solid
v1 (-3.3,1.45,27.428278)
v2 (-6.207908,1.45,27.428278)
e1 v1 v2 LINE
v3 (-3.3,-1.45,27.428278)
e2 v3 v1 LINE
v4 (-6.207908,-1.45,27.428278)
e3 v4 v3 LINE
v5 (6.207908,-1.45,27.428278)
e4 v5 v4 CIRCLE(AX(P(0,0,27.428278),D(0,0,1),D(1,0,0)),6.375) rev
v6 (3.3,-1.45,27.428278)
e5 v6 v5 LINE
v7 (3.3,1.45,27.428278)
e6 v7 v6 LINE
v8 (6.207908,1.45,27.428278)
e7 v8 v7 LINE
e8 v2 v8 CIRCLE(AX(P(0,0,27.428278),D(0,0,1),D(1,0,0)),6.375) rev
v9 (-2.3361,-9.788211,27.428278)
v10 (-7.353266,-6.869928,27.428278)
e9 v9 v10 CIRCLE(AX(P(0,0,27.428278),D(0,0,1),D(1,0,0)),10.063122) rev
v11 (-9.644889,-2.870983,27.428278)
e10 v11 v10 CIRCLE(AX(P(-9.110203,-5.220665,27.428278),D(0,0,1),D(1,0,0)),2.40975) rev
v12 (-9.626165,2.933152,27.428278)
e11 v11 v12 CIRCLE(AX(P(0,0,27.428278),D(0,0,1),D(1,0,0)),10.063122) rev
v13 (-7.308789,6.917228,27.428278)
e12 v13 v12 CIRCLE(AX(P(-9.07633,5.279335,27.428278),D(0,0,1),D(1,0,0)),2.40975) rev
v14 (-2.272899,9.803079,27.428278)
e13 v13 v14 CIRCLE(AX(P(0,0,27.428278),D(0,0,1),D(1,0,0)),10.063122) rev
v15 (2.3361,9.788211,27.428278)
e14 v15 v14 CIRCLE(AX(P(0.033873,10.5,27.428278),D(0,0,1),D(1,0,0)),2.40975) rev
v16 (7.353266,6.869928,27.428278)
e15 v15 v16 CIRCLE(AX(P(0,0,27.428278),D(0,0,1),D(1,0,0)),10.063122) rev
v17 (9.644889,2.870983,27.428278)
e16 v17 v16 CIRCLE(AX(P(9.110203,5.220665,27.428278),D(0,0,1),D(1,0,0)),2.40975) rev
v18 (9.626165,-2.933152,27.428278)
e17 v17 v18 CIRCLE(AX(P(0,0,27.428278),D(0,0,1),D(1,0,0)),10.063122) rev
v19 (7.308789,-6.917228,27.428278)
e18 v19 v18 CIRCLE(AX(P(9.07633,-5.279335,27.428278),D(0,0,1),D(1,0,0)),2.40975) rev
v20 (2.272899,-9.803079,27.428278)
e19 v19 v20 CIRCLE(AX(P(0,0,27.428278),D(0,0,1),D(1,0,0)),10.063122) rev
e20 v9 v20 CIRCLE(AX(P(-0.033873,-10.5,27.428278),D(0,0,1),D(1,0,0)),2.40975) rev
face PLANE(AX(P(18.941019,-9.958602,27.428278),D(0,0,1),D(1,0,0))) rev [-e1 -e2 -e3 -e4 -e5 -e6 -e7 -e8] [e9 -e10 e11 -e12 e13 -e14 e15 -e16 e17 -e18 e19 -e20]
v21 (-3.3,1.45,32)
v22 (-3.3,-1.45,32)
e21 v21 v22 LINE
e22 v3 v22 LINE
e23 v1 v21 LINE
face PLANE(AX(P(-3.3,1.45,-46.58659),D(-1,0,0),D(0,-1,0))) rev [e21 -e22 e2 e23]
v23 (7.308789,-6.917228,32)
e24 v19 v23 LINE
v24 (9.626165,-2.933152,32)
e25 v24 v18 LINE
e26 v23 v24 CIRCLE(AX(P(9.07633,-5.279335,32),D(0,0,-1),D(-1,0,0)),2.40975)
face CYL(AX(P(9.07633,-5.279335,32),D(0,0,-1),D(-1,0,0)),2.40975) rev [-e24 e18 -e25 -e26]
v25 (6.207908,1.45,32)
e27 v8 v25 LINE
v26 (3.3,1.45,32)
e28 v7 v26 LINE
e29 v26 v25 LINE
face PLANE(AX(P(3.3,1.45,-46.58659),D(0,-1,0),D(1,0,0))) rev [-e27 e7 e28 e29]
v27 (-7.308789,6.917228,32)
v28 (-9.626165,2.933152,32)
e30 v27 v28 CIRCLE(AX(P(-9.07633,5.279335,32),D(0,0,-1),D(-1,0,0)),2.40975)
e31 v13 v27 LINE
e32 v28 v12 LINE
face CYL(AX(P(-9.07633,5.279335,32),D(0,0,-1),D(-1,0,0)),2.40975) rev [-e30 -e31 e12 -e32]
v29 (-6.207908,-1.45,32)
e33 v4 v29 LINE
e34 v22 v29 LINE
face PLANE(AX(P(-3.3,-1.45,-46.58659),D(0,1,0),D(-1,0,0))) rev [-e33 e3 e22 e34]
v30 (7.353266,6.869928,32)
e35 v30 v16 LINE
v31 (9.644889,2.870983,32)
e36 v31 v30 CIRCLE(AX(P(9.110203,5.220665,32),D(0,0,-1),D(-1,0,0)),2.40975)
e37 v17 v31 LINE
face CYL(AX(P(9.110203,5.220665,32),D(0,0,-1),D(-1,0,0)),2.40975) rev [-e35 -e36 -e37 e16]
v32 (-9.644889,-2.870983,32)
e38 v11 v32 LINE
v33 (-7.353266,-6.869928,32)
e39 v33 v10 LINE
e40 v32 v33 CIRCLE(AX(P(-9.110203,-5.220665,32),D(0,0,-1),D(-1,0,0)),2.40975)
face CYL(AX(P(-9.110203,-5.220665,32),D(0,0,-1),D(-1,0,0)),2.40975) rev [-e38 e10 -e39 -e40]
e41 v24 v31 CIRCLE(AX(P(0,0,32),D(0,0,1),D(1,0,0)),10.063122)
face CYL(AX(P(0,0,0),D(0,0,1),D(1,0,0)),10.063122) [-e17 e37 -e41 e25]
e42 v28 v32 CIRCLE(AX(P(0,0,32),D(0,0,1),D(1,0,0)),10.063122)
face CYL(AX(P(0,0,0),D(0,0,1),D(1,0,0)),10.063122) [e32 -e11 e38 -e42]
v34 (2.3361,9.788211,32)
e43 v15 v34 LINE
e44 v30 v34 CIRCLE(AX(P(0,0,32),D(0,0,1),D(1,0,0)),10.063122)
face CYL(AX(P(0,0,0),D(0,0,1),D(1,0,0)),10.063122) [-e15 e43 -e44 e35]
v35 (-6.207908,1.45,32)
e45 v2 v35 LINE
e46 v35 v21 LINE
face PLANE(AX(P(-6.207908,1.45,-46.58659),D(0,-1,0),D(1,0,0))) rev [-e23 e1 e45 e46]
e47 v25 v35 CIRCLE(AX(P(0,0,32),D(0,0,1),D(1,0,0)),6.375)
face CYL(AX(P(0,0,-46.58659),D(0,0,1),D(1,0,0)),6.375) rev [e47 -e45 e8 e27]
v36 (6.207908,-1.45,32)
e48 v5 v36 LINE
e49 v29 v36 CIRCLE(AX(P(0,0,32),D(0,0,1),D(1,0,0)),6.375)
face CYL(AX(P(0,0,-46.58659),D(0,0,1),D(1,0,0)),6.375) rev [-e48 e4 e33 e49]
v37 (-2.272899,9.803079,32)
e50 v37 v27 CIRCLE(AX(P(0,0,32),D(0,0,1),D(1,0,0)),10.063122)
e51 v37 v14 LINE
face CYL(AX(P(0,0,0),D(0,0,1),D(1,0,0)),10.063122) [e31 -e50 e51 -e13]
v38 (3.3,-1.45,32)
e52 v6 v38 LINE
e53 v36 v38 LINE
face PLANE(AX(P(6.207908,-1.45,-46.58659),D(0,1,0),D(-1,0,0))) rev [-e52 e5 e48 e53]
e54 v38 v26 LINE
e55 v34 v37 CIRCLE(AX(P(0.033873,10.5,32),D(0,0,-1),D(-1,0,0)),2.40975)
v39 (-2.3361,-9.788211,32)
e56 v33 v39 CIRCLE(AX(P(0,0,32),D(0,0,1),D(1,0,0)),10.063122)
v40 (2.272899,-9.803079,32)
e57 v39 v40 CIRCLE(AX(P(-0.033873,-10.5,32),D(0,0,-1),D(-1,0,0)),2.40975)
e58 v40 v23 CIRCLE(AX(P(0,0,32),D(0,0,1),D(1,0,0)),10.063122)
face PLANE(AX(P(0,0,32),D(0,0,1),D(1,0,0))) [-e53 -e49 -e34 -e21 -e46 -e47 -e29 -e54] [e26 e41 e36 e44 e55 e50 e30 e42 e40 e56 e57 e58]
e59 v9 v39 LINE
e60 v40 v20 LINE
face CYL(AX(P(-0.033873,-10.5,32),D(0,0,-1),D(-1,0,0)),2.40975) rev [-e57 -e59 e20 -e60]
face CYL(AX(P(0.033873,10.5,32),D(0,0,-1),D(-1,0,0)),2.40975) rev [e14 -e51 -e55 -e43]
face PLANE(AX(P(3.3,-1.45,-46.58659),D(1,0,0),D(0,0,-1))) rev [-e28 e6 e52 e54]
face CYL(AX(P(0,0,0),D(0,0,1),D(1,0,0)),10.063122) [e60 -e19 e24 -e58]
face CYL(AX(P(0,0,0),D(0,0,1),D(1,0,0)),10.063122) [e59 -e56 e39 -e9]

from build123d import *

# Parameters (mm, degrees)
SKETCH3_R               = 21
BOSS_EXTRUDE3_DEPTH     = 32
CUT_EXTRUDE1_START      = -30
SKETCH4_R               = 21
SKETCH4_R_2             = 19.31273959
CUT_EXTRUDE1_DEPTH      = 28
SKETCH8_R               = 6.075
SKETCH8_R_2             = 2.409749928
CUT_EXTRUDE2_DEPTH      = 44.657759906
FILLET1_R               = 1
FILLET3_R               = 5
BOSS_EXTRUDE4_START     = -17
SKETCH11_R              = 8
BOSS_EXTRUDE4_DEPTH     = 15
SKETCH12_W              = 6.25
SKETCH12_H              = 3.5
BOSS_EXTRUDE5_DEPTH     = 17
SKETCH15_OUTSIDE_W      = 57.494
SKETCH15_OUTSIDE_H      = 57.494
SKETCH15_OUTSIDE_R      = 21
CUT_EXTRUDE3_DEPTH      = 17
SKETCH16_R              = 25.999161841
SKETCH16_R_2            = 10.063122469
CUT_EXTRUDE4_DEPTH      = 44.657759954
CUT_EXTRUDE5_DEPTH      = 35.948058737
CUT_EXTRUDE5_DEPTH_BACK = 35.948058737
SKETCH17_W              = 34.125667019
SKETCH17_H              = 28.204609122


with BuildPart() as part:
    # Sketch3 → Boss-Extrude3 (new body)
    with BuildSketch(Plane.XY):
        Circle(SKETCH3_R)
    extrude(amount=BOSS_EXTRUDE3_DEPTH)

    # Sketch4 → Cut-Extrude1 (cut)
    with BuildSketch(Plane.XY.offset(32).offset(CUT_EXTRUDE1_START)):
        Circle(SKETCH4_R)
        Circle(SKETCH4_R_2, mode=Mode.SUBTRACT)
    extrude(amount=CUT_EXTRUDE1_DEPTH, mode=Mode.SUBTRACT)

    # Cut-Sweep1: sweep along a curve in space
    with BuildLine() as cut_sweep1_path:
        ThreePointArc((19.31273959, 0, 2), (13.656169127, 13.656169127, 2), (0, 19.31273959, 2))
        ThreePointArc((0, 19.31273959, 2), (-13.656169127, 13.656169127, 2), (-19.31273959, 0, 2))
        ThreePointArc((-19.31273959, 0, 2), (-13.656169127, -13.656169127, 2), (0, -19.31273959, 2))
        ThreePointArc((0, -19.31273959, 2), (13.656169127, -13.656169127, 2), (19.31273959, 0, 2))
    # Sketch7 → Cut-Sweep1 (sweep, cut)
    with BuildSketch(Plane(origin=(0, 0, 0), x_dir=(1, 0, 0), z_dir=(0, 1, 0))):
        with BuildLine():
            Line((-19.31273959, -2), (-19.31273959, -30))
            ThreePointArc((-19.31273959, -30), (-17.146485403, -16), (-19.31273959, -2))
        make_face()
    sweep(path=cut_sweep1_path.line, mode=Mode.SUBTRACT)

    # Sketch8 → Cut-Extrude2 (cut, through all)
    with BuildSketch(Plane(origin=(0, 0, 0), x_dir=(-1, 0, 0), z_dir=(0, 0, -1))):
        Circle(SKETCH8_R)
        with Locations((9.076330186, 5.279334971)):
            Circle(SKETCH8_R_2)
        with Locations((-0.033873107, 10.5)):
            Circle(SKETCH8_R_2)
        with Locations((9.110203293, -5.220665029)):
            Circle(SKETCH8_R_2)
        with Locations((0.033873107, -10.5)):
            Circle(SKETCH8_R_2)
        with Locations((-9.076330186, -5.279334971)):
            Circle(SKETCH8_R_2)
        with Locations((-9.110203293, 5.220665029)):
            Circle(SKETCH8_R_2)
    extrude(amount=-CUT_EXTRUDE2_DEPTH, mode=Mode.SUBTRACT)

    # Sketch10 → Cut-Revolve1 (revolve, cut)
    with BuildSketch(Plane(origin=(0, 0, 0), x_dir=(1, 0, 0), z_dir=(0, 1, 0))):
        Polygon((-6.075, 0), (-15.24176478, -2.795793959), (-19.075, 0), align=None)
    revolve(axis=Axis((0, 0, 2), (0, 0, 1)), mode=Mode.SUBTRACT)

    # Fillet1
    fillet1_edges = [part.edges().sort_by_distance(p)[0] for p in [
        (-21, 0, 2),
        (-21, 0, 30),
    ]]
    fillet(fillet1_edges, radius=FILLET1_R)

    # Fillet3
    # the kernel refuses this fillet: 5 mm, written as the material it adds along each edge
    with BuildSketch(Plane(origin=(0, 0, 2.795793959), x_dir=(-1, 0, 0), z_dir=(0, 1, 0))) as fillet3_piece_1_section:
        with BuildLine():
            CenterArc((15.24176478 - FILLET3_R * 0.185863598659, -FILLET3_R * 1.10216314652), FILLET3_R, 53.894625959, 53.066683648)
            Line((15.24176478 - FILLET3_R * 0.47758946832, -FILLET3_R * 0.145661177375), (15.24176478, 0))
            Line((15.24176478, 0), (15.24176478 + FILLET3_R * 0.403408541274, -FILLET3_R * 0.294228529669))
        make_face()
    fillet3_piece_1 = revolve(axis=Axis((0, 0, 2.795793959), (0, 0, 1)), mode=Mode.PRIVATE)
    fillet3_piece_1 = fillet3_piece_1 - Plane(origin=(-9.110203293, -5.220665029, 2.265856679), x_dir=(-1, 0, 0), z_dir=(0, 0, -1)) * Cylinder(2.409749928, 70, mode=Mode.PRIVATE)
    fillet3_piece_1 = fillet3_piece_1 - Plane(origin=(-0.033873107, -10.5, 2.265856679), x_dir=(-1, 0, 0), z_dir=(0, 0, -1)) * Cylinder(2.409749928, 70, mode=Mode.PRIVATE)
    fillet3_piece_1 = fillet3_piece_1 - Plane(origin=(9.076330186, -5.279334971, 2.265856679), x_dir=(-1, 0, 0), z_dir=(0, 0, -1)) * Cylinder(2.409749928, 70, mode=Mode.PRIVATE)
    fillet3_piece_1 = fillet3_piece_1 - Plane(origin=(9.110203293, 5.220665029, 2.265856679), x_dir=(-1, 0, 0), z_dir=(0, 0, -1)) * Cylinder(2.409749928, 70, mode=Mode.PRIVATE)
    fillet3_piece_1 = fillet3_piece_1 - Plane(origin=(-9.076330186, 5.279334971, 2.265856679), x_dir=(-1, 0, 0), z_dir=(0, 0, -1)) * Cylinder(2.409749928, 70, mode=Mode.PRIVATE)
    fillet3_piece_1 = fillet3_piece_1 - Plane(origin=(0.033873107, 10.5, 2.265856679), x_dir=(-1, 0, 0), z_dir=(0, 0, -1)) * Cylinder(2.409749928, 70, mode=Mode.PRIVATE)
    add(fillet3_piece_1)

    # Sketch11 → Boss-Extrude4 (add)
    with BuildSketch(Plane.XY.offset(32).offset(BOSS_EXTRUDE4_START)):
        Circle(SKETCH11_R)
    extrude(amount=-BOSS_EXTRUDE4_DEPTH)

    # Sketch12 → Boss-Extrude5 (add)
    with BuildSketch(Plane.XY.offset(32)):
        with Locations((-6.125, 0)):
            Rectangle(SKETCH12_W, SKETCH12_H)
        with Locations((6.125, 0)):
            Rectangle(SKETCH12_W, SKETCH12_H)
    extrude(amount=-BOSS_EXTRUDE5_DEPTH)

    # Sketch15 outside → Cut-Extrude3 (cut)
    # profile 1 of 2: a face of its own
    with BuildSketch(Plane.XY.offset(32)):
        Rectangle(SKETCH15_OUTSIDE_W, SKETCH15_OUTSIDE_H)
        Circle(SKETCH15_OUTSIDE_R, mode=Mode.SUBTRACT)
    # profile 2 of 2: a face of its own
    with BuildSketch(Plane.XY.offset(32)):
        with BuildLine():
            Line((-6.207908263, 1.45), (-3.3, 1.45))
            Line((-3.3, 1.45), (-3.3, -1.45))
            Line((-3.3, -1.45), (-6.207908263, -1.45))
            ThreePointArc((-6.207908263, -1.45), (0, -6.375), (6.207908263, -1.45))
            Line((6.207908263, -1.45), (3.3, -1.45))
            Line((3.3, -1.45), (3.3, 1.45))
            Line((3.3, 1.45), (6.207908263, 1.45))
            ThreePointArc((6.207908263, 1.45), (0, 6.375), (-6.207908263, 1.45))
        make_face()
    extrude(amount=-CUT_EXTRUDE3_DEPTH, mode=Mode.SUBTRACT)

    # Sketch16 → Cut-Extrude4 (cut, through all)
    with BuildSketch(Plane.XY.offset(32)):
        Circle(SKETCH16_R)
        Circle(SKETCH16_R_2, mode=Mode.SUBTRACT)
    extrude(amount=-CUT_EXTRUDE4_DEPTH, mode=Mode.SUBTRACT)

    # Sketch17 → Cut-Extrude5 (cut, two sides: drawn at the far end of the back side and taken through both)
    with BuildSketch(Plane(origin=(0, 0, 0), x_dir=(1, 0, 0), z_dir=(0, 1, 0)).offset(-CUT_EXTRUDE5_DEPTH_BACK)):
        with Locations((1.878185032, -13.325973853)):
            Rectangle(SKETCH17_W, SKETCH17_H)
    extrude(amount=CUT_EXTRUDE5_DEPTH + CUT_EXTRUDE5_DEPTH_BACK, mode=Mode.SUBTRACT)


solid = part.part
